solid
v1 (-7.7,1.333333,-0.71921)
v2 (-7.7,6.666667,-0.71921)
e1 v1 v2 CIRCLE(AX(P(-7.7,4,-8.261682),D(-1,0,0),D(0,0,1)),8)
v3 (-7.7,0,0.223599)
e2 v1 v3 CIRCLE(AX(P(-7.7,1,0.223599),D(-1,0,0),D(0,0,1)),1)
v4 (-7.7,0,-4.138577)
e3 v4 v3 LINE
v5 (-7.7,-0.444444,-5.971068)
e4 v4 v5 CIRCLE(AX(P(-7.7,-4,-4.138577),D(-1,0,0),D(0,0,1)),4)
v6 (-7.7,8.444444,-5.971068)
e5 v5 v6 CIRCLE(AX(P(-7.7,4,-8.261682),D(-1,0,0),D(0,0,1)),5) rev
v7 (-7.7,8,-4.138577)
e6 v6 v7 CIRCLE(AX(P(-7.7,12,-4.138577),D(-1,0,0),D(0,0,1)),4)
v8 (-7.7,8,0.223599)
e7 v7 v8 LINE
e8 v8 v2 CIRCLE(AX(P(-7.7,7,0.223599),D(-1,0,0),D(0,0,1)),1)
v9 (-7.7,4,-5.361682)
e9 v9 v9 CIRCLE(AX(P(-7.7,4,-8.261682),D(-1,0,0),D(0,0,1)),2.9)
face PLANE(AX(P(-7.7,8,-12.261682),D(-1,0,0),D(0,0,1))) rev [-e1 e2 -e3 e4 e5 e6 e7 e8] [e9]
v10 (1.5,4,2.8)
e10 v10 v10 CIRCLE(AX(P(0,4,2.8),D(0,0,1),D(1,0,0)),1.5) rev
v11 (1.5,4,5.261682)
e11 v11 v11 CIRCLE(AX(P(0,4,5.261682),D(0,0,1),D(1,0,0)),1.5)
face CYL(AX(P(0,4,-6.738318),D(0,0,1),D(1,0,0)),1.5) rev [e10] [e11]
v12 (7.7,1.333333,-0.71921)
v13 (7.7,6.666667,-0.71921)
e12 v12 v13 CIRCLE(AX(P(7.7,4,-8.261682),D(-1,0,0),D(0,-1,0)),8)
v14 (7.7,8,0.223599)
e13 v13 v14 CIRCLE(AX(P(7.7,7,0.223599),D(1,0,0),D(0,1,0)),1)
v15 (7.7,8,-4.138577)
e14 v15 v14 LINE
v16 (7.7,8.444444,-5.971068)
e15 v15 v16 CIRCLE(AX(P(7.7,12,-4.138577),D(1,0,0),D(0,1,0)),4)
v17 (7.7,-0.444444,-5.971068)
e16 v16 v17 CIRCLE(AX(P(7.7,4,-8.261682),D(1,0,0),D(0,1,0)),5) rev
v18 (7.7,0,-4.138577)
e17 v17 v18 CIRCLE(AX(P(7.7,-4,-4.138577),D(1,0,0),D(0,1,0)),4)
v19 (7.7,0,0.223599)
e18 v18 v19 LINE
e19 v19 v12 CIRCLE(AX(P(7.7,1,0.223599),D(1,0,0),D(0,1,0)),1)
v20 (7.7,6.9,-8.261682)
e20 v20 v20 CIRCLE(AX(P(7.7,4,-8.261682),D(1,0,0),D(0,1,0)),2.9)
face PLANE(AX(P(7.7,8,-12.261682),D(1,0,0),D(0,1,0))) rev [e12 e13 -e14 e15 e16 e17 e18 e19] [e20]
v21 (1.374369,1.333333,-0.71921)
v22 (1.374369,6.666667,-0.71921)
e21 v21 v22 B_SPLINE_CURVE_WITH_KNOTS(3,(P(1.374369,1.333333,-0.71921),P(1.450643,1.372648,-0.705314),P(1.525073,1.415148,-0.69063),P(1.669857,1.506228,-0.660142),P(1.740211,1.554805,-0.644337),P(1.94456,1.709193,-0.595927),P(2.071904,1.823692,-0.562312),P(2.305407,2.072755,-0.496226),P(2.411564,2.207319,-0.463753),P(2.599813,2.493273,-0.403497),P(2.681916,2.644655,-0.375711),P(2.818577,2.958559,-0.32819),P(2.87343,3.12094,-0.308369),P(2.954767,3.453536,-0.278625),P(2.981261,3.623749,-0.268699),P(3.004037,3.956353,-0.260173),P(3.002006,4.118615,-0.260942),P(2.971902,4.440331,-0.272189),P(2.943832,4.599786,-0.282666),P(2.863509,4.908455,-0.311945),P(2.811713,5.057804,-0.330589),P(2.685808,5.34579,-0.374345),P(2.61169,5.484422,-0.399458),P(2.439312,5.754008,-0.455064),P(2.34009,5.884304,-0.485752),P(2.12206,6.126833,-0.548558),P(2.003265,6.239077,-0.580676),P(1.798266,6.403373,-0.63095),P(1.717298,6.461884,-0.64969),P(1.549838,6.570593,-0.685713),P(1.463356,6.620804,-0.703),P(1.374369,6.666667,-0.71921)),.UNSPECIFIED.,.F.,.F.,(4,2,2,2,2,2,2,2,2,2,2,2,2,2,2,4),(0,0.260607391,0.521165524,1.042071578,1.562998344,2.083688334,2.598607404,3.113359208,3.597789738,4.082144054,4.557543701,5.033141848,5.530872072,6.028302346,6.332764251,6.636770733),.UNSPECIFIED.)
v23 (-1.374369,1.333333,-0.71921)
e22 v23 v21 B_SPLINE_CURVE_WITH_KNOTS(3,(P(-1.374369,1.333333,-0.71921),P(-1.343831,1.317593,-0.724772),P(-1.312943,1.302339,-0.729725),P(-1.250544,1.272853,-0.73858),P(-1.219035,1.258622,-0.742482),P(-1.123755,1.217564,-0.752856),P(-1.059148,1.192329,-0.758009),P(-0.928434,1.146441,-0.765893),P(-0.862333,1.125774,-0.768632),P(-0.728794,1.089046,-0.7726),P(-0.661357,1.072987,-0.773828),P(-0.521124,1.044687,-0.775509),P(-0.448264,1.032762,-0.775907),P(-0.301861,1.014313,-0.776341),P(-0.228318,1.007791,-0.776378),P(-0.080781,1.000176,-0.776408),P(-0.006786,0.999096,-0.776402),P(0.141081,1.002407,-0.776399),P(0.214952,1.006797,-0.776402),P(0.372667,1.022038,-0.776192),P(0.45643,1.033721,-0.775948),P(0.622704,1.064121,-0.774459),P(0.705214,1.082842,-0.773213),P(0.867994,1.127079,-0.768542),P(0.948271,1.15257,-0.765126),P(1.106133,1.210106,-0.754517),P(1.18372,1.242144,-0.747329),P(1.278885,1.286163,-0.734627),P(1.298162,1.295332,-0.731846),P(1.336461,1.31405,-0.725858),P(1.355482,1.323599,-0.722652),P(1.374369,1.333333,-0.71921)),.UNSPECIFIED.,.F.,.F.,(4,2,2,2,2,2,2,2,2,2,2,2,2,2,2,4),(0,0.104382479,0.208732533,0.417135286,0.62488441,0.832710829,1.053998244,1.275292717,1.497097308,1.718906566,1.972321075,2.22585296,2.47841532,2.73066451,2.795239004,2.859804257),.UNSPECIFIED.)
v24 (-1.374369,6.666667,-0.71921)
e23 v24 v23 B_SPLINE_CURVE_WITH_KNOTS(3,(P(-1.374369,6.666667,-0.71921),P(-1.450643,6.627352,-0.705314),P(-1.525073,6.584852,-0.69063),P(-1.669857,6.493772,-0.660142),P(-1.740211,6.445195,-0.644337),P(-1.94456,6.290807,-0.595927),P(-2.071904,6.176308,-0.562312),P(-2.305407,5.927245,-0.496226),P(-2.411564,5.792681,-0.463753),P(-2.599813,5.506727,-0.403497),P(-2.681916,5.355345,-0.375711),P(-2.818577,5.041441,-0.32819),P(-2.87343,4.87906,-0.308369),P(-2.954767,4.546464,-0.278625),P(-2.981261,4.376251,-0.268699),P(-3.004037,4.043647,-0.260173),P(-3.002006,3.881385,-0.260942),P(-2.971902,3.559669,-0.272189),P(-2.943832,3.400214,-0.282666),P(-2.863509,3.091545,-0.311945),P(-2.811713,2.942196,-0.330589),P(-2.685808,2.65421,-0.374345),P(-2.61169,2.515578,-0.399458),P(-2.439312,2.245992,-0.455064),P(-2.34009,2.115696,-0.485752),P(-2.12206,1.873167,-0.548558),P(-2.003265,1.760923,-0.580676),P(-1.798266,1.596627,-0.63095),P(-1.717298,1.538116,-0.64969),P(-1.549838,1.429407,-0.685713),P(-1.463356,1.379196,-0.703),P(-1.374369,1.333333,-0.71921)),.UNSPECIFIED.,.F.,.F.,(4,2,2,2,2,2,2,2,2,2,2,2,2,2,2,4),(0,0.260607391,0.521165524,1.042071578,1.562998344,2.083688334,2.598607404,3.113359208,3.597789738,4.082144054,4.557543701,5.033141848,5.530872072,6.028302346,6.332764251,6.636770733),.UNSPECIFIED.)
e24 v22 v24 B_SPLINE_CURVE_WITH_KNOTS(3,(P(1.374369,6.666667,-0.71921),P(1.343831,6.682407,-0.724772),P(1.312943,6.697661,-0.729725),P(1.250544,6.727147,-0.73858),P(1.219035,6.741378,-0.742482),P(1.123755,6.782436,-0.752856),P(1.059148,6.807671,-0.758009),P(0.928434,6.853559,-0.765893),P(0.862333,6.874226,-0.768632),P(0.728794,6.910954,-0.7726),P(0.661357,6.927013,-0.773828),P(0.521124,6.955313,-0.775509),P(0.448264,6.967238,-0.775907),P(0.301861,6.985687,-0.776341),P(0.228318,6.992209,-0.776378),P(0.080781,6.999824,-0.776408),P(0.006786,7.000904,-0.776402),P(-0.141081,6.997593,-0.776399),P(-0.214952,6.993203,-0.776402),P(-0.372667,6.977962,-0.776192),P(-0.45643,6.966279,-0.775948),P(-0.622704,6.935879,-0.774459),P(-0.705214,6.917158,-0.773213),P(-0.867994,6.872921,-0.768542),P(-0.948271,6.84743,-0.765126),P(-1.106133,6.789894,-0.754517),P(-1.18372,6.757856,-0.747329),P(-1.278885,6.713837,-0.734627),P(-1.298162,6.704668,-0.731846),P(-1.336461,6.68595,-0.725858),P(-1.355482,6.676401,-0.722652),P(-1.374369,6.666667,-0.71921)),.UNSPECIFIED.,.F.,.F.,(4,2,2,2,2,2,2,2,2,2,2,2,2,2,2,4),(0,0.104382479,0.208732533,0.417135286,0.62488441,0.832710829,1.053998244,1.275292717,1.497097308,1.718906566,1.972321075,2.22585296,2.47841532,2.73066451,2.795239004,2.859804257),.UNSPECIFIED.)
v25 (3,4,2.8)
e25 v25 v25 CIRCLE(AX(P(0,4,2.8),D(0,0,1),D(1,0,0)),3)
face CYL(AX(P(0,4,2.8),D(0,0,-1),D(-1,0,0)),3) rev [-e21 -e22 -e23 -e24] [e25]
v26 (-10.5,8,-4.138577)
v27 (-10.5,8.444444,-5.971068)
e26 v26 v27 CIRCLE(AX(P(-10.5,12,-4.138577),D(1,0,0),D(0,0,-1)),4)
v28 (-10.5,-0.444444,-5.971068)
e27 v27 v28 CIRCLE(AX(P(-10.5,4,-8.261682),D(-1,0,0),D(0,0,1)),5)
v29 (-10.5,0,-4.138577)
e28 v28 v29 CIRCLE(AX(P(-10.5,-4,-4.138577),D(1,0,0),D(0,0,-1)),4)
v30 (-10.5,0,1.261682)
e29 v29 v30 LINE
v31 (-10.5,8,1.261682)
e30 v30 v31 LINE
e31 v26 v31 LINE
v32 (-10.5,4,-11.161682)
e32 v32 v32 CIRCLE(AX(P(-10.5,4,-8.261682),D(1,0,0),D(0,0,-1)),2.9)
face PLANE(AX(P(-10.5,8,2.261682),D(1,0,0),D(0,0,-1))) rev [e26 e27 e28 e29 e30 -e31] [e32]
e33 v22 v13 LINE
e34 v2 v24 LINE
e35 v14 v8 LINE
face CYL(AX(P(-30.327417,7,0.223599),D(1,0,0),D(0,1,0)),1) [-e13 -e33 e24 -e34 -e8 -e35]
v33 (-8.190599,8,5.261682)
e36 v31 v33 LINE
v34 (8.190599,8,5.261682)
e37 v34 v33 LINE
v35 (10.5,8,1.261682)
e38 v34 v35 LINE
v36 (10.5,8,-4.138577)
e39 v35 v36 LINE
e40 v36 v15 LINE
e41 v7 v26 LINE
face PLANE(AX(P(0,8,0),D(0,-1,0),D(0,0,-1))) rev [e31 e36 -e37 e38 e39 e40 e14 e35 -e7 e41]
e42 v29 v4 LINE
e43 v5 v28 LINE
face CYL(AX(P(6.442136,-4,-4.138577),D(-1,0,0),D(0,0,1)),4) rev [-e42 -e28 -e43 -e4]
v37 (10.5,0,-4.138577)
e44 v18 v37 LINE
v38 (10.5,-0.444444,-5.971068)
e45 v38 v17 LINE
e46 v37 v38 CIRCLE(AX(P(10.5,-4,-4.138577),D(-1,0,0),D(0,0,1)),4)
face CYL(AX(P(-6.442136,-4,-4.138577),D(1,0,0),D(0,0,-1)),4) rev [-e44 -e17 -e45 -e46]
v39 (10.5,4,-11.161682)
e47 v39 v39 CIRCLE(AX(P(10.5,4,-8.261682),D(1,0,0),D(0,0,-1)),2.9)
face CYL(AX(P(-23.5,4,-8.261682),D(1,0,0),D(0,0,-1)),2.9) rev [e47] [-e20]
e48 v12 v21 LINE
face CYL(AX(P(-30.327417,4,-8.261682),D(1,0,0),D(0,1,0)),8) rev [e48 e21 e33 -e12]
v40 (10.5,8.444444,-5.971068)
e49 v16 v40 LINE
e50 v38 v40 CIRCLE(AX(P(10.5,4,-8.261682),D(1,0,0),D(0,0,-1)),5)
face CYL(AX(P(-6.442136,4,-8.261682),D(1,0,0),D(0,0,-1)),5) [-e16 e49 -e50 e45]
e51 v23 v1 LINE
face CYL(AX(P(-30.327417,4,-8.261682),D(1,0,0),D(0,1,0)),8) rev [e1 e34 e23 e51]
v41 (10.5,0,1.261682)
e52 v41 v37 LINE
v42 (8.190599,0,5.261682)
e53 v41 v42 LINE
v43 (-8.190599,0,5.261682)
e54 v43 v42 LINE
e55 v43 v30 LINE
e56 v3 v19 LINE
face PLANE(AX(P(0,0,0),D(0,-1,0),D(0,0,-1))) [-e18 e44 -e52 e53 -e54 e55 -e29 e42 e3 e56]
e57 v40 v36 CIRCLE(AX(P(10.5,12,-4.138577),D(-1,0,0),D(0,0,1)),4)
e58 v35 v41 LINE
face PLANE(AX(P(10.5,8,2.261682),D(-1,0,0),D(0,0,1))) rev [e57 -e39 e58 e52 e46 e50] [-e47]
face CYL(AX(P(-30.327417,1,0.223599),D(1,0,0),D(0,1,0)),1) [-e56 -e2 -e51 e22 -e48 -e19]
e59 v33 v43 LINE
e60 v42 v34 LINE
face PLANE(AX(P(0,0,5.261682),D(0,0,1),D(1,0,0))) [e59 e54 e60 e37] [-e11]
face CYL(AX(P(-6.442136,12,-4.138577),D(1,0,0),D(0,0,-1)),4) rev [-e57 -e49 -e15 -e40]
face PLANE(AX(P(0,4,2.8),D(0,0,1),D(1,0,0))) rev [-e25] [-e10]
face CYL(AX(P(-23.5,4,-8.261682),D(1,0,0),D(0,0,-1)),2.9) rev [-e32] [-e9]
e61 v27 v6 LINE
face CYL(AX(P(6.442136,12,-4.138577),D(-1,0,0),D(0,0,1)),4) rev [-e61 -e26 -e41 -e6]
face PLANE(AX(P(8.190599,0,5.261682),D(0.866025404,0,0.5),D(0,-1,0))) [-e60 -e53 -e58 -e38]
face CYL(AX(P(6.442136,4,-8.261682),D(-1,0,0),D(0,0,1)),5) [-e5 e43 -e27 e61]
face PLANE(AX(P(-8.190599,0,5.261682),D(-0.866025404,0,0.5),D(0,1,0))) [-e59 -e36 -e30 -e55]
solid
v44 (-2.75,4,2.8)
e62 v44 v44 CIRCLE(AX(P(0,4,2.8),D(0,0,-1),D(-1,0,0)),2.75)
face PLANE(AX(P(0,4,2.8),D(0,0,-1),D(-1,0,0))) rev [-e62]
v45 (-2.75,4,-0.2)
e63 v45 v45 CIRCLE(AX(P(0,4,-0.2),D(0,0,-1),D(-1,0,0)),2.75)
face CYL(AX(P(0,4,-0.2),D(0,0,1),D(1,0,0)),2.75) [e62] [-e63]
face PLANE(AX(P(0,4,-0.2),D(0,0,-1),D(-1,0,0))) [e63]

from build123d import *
from OCP.BRepFilletAPI import BRepFilletAPI_MakeChamfer

# Parameters (mm, degrees)
SKETCH1_W               = 21
SKETCH1_H               = 4.523364486
BOSS_EXTRUDE1_DEPTH     = 8
SKETCH2_W               = 2.8
SKETCH2_H               = 8
BOSS_EXTRUDE2_DEPTH     = 10
SKETCH3_R               = 2.9
CUT_EXTRUDE1_DEPTH      = 34
FILLET1_R               = 4
SKETCH4_R               = 8
CUT_EXTRUDE2_DEPTH      = 15.4
FILLET2_R               = 1
SKETCH6_W               = 21
SKETCH6_H               = 8
BOSS_EXTRUDE3_DEPTH     = 3
SKETCH7_R               = 1.5
CUT_EXTRUDE3_DEPTH      = 12
CUT_EXTRUDE4_DEPTH      = 2.8
CUT_EXTRUDE4_DEPTH_BACK = 12
SKETCH8_R               = 3
SKETCH9_R               = 2.75
BOSS_EXTRUDE4_DEPTH     = 3
CHAMFER1_SIZE           = 4
CHAMFER1_SIZE2          = 2.309401077
SKETCH10_R              = 5
SKETCH10_R_2            = 2.9
BOSS_EXTRUDE5_DEPTH     = 2.8
BOSS_EXTRUDE6_START     = -2.8
SKETCH11_R              = 5
SKETCH11_R_2            = 2.9
BOSS_EXTRUDE6_DEPTH     = 2.8
FILLET3_R               = 4


with BuildPart() as part:
    # Sketch1 → Boss-Extrude1 (new body)
    with BuildSketch(Plane(origin=(0, 0, 0), x_dir=(1, 0, 0), z_dir=(0, 1, 0))):
        Rectangle(SKETCH1_W, SKETCH1_H)
    extrude(amount=BOSS_EXTRUDE1_DEPTH)

    # Sketch2 → Boss-Extrude2 (add)
    with BuildSketch(Plane(origin=(0, 0, -2.261682243), x_dir=(-1, 0, 0), z_dir=(0, 0, -1))):
        with Locations((9.1, 4)):
            Rectangle(SKETCH2_W, SKETCH2_H)
        with Locations((-9.1, 4)):
            Rectangle(SKETCH2_W, SKETCH2_H)
    extrude(amount=BOSS_EXTRUDE2_DEPTH)

    # Sketch3 → Cut-Extrude1 (cut)
    with BuildSketch(Plane(origin=(10.5, 0, 0), x_dir=(0, 0, -1), z_dir=(1, 0, 0))):
        with Locations((8.261682243, 4)):
            Circle(SKETCH3_R)
    extrude(amount=-CUT_EXTRUDE1_DEPTH, mode=Mode.SUBTRACT)

    # Fillet1
    fillet1_edges = [part.edges().sort_by_distance(p)[0] for p in [
        (9.1, 0, -12.261682243),
        (-9.1, 0, -12.261682243),
        (-9.1, 8, -12.261682243),
        (9.1, 8, -12.261682243),
    ]]
    fillet(fillet1_edges, radius=FILLET1_R - 0.0001)  # a hair under: the kernel refuses the full size

    # Sketch4 → Cut-Extrude2 (cut)
    with BuildSketch(Plane.ZY.offset(-7.7)):
        with Locations((-8.261682243, 4)):
            Circle(SKETCH4_R)
    extrude(amount=CUT_EXTRUDE2_DEPTH, mode=Mode.SUBTRACT)

    # Fillet2
    fillet2_edges = [part.edges().sort_by_distance(p)[0] for p in [
        (0, 0, -1.333479013),
        (0, 8, -1.333479013),
    ]]
    fillet(fillet2_edges, radius=FILLET2_R)

    # Sketch6 → Boss-Extrude3 (add)
    with BuildSketch(Plane.XY.offset(2.261682243)):
        with Locations((0, 4)):
            Rectangle(SKETCH6_W, SKETCH6_H)
    extrude(amount=BOSS_EXTRUDE3_DEPTH)

    # Sketch7 → Cut-Extrude3 (cut)
    with BuildSketch(Plane.XY.offset(5.261682243)):
        with Locations((0, 4)):
            Circle(SKETCH7_R)
    extrude(amount=-CUT_EXTRUDE3_DEPTH, mode=Mode.SUBTRACT)

    # Sketch8 → Cut-Extrude4 (cut, two sides: drawn at the far end of the back side and taken through both)
    with BuildSketch(Plane.XY.offset(-CUT_EXTRUDE4_DEPTH_BACK)):
        with Locations(Location((0, 4, 0), (0, 0, 117.266044451))):
            Circle(SKETCH8_R)
    extrude(amount=CUT_EXTRUDE4_DEPTH + CUT_EXTRUDE4_DEPTH_BACK, mode=Mode.SUBTRACT)

    # Chamfer1: one chamfer whose edges measure the first distance from different faces: ONE call of the kernel's chamfer builder (chamfer() names one face for all edges)
    chamfer1_edges_1 = [part.edges().sort_by_distance(p)[0] for p in [
        (-10.5, 4, 5.261682243),
    ]]
    chamfer1_side_1 = [part.faces().sort_by_distance(p)[0] for p in [
        (-10.5, 4, -1.817687079),
    ]]
    chamfer1_edges_2 = [part.edges().sort_by_distance(p)[0] for p in [
        (10.5, 4, 5.261682243),
    ]]
    chamfer1_side_2 = [part.faces().sort_by_distance(p)[0] for p in [
        (10.5, 4, -1.817687079),
    ]]
    chamfer1 = BRepFilletAPI_MakeChamfer(part.part.solid().wrapped)
    for e in chamfer1_edges_1:
        chamfer1.Add(CHAMFER1_SIZE, CHAMFER1_SIZE2, e.wrapped, chamfer1_side_1[0].wrapped)  # the first distance lies on this face
    for e in chamfer1_edges_2:
        chamfer1.Add(CHAMFER1_SIZE, CHAMFER1_SIZE2, e.wrapped, chamfer1_side_2[0].wrapped)  # the first distance lies on this face
    add(Compound.cast(chamfer1.Shape()), mode=Mode.REPLACE)

    # Sketch10 → Boss-Extrude5 (add)
    with BuildSketch(Plane(origin=(10.5, 0, 0), x_dir=(0, 0, -1), z_dir=(1, 0, 0))):
        with Locations((8.261682243, 4)):
            Circle(SKETCH10_R)
        with Locations((8.261682243, 4)):
            Circle(SKETCH10_R_2, mode=Mode.SUBTRACT)
    extrude(amount=-BOSS_EXTRUDE5_DEPTH)

    # Sketch11 → Boss-Extrude6 (add)
    with BuildSketch(Plane.ZY.offset(10.5).offset(BOSS_EXTRUDE6_START)):
        with Locations((-8.261682243, 4)):
            Circle(SKETCH11_R)
        with Locations(Location((-8.261682243, 4, 0), (0, 0, 180))):
            Circle(SKETCH11_R_2, mode=Mode.SUBTRACT)
    extrude(amount=BOSS_EXTRUDE6_DEPTH)

    # Fillet3
    fillet3_edges = [part.edges().sort_by_distance(p)[0] for p in [
        (9.1, 0, -5.261682243),
        (9.1, 8, -5.261682243),
        (-9.1, 0, -5.261682243),
        (-9.1, 8, -5.261682243),
    ]]
    fillet(fillet3_edges, radius=FILLET3_R)


with BuildPart() as body_2:
    # Sketch9 → Boss-Extrude4 (new body)
    with BuildSketch(Plane(origin=(0, 0, 2.8), x_dir=(-1, 0, 0), z_dir=(0, 0, -1))):
        with Locations((0, 4)):
            Circle(SKETCH9_R)
    extrude(amount=BOSS_EXTRUDE4_DEPTH)


solid = Compound([part.part, body_2.part])
